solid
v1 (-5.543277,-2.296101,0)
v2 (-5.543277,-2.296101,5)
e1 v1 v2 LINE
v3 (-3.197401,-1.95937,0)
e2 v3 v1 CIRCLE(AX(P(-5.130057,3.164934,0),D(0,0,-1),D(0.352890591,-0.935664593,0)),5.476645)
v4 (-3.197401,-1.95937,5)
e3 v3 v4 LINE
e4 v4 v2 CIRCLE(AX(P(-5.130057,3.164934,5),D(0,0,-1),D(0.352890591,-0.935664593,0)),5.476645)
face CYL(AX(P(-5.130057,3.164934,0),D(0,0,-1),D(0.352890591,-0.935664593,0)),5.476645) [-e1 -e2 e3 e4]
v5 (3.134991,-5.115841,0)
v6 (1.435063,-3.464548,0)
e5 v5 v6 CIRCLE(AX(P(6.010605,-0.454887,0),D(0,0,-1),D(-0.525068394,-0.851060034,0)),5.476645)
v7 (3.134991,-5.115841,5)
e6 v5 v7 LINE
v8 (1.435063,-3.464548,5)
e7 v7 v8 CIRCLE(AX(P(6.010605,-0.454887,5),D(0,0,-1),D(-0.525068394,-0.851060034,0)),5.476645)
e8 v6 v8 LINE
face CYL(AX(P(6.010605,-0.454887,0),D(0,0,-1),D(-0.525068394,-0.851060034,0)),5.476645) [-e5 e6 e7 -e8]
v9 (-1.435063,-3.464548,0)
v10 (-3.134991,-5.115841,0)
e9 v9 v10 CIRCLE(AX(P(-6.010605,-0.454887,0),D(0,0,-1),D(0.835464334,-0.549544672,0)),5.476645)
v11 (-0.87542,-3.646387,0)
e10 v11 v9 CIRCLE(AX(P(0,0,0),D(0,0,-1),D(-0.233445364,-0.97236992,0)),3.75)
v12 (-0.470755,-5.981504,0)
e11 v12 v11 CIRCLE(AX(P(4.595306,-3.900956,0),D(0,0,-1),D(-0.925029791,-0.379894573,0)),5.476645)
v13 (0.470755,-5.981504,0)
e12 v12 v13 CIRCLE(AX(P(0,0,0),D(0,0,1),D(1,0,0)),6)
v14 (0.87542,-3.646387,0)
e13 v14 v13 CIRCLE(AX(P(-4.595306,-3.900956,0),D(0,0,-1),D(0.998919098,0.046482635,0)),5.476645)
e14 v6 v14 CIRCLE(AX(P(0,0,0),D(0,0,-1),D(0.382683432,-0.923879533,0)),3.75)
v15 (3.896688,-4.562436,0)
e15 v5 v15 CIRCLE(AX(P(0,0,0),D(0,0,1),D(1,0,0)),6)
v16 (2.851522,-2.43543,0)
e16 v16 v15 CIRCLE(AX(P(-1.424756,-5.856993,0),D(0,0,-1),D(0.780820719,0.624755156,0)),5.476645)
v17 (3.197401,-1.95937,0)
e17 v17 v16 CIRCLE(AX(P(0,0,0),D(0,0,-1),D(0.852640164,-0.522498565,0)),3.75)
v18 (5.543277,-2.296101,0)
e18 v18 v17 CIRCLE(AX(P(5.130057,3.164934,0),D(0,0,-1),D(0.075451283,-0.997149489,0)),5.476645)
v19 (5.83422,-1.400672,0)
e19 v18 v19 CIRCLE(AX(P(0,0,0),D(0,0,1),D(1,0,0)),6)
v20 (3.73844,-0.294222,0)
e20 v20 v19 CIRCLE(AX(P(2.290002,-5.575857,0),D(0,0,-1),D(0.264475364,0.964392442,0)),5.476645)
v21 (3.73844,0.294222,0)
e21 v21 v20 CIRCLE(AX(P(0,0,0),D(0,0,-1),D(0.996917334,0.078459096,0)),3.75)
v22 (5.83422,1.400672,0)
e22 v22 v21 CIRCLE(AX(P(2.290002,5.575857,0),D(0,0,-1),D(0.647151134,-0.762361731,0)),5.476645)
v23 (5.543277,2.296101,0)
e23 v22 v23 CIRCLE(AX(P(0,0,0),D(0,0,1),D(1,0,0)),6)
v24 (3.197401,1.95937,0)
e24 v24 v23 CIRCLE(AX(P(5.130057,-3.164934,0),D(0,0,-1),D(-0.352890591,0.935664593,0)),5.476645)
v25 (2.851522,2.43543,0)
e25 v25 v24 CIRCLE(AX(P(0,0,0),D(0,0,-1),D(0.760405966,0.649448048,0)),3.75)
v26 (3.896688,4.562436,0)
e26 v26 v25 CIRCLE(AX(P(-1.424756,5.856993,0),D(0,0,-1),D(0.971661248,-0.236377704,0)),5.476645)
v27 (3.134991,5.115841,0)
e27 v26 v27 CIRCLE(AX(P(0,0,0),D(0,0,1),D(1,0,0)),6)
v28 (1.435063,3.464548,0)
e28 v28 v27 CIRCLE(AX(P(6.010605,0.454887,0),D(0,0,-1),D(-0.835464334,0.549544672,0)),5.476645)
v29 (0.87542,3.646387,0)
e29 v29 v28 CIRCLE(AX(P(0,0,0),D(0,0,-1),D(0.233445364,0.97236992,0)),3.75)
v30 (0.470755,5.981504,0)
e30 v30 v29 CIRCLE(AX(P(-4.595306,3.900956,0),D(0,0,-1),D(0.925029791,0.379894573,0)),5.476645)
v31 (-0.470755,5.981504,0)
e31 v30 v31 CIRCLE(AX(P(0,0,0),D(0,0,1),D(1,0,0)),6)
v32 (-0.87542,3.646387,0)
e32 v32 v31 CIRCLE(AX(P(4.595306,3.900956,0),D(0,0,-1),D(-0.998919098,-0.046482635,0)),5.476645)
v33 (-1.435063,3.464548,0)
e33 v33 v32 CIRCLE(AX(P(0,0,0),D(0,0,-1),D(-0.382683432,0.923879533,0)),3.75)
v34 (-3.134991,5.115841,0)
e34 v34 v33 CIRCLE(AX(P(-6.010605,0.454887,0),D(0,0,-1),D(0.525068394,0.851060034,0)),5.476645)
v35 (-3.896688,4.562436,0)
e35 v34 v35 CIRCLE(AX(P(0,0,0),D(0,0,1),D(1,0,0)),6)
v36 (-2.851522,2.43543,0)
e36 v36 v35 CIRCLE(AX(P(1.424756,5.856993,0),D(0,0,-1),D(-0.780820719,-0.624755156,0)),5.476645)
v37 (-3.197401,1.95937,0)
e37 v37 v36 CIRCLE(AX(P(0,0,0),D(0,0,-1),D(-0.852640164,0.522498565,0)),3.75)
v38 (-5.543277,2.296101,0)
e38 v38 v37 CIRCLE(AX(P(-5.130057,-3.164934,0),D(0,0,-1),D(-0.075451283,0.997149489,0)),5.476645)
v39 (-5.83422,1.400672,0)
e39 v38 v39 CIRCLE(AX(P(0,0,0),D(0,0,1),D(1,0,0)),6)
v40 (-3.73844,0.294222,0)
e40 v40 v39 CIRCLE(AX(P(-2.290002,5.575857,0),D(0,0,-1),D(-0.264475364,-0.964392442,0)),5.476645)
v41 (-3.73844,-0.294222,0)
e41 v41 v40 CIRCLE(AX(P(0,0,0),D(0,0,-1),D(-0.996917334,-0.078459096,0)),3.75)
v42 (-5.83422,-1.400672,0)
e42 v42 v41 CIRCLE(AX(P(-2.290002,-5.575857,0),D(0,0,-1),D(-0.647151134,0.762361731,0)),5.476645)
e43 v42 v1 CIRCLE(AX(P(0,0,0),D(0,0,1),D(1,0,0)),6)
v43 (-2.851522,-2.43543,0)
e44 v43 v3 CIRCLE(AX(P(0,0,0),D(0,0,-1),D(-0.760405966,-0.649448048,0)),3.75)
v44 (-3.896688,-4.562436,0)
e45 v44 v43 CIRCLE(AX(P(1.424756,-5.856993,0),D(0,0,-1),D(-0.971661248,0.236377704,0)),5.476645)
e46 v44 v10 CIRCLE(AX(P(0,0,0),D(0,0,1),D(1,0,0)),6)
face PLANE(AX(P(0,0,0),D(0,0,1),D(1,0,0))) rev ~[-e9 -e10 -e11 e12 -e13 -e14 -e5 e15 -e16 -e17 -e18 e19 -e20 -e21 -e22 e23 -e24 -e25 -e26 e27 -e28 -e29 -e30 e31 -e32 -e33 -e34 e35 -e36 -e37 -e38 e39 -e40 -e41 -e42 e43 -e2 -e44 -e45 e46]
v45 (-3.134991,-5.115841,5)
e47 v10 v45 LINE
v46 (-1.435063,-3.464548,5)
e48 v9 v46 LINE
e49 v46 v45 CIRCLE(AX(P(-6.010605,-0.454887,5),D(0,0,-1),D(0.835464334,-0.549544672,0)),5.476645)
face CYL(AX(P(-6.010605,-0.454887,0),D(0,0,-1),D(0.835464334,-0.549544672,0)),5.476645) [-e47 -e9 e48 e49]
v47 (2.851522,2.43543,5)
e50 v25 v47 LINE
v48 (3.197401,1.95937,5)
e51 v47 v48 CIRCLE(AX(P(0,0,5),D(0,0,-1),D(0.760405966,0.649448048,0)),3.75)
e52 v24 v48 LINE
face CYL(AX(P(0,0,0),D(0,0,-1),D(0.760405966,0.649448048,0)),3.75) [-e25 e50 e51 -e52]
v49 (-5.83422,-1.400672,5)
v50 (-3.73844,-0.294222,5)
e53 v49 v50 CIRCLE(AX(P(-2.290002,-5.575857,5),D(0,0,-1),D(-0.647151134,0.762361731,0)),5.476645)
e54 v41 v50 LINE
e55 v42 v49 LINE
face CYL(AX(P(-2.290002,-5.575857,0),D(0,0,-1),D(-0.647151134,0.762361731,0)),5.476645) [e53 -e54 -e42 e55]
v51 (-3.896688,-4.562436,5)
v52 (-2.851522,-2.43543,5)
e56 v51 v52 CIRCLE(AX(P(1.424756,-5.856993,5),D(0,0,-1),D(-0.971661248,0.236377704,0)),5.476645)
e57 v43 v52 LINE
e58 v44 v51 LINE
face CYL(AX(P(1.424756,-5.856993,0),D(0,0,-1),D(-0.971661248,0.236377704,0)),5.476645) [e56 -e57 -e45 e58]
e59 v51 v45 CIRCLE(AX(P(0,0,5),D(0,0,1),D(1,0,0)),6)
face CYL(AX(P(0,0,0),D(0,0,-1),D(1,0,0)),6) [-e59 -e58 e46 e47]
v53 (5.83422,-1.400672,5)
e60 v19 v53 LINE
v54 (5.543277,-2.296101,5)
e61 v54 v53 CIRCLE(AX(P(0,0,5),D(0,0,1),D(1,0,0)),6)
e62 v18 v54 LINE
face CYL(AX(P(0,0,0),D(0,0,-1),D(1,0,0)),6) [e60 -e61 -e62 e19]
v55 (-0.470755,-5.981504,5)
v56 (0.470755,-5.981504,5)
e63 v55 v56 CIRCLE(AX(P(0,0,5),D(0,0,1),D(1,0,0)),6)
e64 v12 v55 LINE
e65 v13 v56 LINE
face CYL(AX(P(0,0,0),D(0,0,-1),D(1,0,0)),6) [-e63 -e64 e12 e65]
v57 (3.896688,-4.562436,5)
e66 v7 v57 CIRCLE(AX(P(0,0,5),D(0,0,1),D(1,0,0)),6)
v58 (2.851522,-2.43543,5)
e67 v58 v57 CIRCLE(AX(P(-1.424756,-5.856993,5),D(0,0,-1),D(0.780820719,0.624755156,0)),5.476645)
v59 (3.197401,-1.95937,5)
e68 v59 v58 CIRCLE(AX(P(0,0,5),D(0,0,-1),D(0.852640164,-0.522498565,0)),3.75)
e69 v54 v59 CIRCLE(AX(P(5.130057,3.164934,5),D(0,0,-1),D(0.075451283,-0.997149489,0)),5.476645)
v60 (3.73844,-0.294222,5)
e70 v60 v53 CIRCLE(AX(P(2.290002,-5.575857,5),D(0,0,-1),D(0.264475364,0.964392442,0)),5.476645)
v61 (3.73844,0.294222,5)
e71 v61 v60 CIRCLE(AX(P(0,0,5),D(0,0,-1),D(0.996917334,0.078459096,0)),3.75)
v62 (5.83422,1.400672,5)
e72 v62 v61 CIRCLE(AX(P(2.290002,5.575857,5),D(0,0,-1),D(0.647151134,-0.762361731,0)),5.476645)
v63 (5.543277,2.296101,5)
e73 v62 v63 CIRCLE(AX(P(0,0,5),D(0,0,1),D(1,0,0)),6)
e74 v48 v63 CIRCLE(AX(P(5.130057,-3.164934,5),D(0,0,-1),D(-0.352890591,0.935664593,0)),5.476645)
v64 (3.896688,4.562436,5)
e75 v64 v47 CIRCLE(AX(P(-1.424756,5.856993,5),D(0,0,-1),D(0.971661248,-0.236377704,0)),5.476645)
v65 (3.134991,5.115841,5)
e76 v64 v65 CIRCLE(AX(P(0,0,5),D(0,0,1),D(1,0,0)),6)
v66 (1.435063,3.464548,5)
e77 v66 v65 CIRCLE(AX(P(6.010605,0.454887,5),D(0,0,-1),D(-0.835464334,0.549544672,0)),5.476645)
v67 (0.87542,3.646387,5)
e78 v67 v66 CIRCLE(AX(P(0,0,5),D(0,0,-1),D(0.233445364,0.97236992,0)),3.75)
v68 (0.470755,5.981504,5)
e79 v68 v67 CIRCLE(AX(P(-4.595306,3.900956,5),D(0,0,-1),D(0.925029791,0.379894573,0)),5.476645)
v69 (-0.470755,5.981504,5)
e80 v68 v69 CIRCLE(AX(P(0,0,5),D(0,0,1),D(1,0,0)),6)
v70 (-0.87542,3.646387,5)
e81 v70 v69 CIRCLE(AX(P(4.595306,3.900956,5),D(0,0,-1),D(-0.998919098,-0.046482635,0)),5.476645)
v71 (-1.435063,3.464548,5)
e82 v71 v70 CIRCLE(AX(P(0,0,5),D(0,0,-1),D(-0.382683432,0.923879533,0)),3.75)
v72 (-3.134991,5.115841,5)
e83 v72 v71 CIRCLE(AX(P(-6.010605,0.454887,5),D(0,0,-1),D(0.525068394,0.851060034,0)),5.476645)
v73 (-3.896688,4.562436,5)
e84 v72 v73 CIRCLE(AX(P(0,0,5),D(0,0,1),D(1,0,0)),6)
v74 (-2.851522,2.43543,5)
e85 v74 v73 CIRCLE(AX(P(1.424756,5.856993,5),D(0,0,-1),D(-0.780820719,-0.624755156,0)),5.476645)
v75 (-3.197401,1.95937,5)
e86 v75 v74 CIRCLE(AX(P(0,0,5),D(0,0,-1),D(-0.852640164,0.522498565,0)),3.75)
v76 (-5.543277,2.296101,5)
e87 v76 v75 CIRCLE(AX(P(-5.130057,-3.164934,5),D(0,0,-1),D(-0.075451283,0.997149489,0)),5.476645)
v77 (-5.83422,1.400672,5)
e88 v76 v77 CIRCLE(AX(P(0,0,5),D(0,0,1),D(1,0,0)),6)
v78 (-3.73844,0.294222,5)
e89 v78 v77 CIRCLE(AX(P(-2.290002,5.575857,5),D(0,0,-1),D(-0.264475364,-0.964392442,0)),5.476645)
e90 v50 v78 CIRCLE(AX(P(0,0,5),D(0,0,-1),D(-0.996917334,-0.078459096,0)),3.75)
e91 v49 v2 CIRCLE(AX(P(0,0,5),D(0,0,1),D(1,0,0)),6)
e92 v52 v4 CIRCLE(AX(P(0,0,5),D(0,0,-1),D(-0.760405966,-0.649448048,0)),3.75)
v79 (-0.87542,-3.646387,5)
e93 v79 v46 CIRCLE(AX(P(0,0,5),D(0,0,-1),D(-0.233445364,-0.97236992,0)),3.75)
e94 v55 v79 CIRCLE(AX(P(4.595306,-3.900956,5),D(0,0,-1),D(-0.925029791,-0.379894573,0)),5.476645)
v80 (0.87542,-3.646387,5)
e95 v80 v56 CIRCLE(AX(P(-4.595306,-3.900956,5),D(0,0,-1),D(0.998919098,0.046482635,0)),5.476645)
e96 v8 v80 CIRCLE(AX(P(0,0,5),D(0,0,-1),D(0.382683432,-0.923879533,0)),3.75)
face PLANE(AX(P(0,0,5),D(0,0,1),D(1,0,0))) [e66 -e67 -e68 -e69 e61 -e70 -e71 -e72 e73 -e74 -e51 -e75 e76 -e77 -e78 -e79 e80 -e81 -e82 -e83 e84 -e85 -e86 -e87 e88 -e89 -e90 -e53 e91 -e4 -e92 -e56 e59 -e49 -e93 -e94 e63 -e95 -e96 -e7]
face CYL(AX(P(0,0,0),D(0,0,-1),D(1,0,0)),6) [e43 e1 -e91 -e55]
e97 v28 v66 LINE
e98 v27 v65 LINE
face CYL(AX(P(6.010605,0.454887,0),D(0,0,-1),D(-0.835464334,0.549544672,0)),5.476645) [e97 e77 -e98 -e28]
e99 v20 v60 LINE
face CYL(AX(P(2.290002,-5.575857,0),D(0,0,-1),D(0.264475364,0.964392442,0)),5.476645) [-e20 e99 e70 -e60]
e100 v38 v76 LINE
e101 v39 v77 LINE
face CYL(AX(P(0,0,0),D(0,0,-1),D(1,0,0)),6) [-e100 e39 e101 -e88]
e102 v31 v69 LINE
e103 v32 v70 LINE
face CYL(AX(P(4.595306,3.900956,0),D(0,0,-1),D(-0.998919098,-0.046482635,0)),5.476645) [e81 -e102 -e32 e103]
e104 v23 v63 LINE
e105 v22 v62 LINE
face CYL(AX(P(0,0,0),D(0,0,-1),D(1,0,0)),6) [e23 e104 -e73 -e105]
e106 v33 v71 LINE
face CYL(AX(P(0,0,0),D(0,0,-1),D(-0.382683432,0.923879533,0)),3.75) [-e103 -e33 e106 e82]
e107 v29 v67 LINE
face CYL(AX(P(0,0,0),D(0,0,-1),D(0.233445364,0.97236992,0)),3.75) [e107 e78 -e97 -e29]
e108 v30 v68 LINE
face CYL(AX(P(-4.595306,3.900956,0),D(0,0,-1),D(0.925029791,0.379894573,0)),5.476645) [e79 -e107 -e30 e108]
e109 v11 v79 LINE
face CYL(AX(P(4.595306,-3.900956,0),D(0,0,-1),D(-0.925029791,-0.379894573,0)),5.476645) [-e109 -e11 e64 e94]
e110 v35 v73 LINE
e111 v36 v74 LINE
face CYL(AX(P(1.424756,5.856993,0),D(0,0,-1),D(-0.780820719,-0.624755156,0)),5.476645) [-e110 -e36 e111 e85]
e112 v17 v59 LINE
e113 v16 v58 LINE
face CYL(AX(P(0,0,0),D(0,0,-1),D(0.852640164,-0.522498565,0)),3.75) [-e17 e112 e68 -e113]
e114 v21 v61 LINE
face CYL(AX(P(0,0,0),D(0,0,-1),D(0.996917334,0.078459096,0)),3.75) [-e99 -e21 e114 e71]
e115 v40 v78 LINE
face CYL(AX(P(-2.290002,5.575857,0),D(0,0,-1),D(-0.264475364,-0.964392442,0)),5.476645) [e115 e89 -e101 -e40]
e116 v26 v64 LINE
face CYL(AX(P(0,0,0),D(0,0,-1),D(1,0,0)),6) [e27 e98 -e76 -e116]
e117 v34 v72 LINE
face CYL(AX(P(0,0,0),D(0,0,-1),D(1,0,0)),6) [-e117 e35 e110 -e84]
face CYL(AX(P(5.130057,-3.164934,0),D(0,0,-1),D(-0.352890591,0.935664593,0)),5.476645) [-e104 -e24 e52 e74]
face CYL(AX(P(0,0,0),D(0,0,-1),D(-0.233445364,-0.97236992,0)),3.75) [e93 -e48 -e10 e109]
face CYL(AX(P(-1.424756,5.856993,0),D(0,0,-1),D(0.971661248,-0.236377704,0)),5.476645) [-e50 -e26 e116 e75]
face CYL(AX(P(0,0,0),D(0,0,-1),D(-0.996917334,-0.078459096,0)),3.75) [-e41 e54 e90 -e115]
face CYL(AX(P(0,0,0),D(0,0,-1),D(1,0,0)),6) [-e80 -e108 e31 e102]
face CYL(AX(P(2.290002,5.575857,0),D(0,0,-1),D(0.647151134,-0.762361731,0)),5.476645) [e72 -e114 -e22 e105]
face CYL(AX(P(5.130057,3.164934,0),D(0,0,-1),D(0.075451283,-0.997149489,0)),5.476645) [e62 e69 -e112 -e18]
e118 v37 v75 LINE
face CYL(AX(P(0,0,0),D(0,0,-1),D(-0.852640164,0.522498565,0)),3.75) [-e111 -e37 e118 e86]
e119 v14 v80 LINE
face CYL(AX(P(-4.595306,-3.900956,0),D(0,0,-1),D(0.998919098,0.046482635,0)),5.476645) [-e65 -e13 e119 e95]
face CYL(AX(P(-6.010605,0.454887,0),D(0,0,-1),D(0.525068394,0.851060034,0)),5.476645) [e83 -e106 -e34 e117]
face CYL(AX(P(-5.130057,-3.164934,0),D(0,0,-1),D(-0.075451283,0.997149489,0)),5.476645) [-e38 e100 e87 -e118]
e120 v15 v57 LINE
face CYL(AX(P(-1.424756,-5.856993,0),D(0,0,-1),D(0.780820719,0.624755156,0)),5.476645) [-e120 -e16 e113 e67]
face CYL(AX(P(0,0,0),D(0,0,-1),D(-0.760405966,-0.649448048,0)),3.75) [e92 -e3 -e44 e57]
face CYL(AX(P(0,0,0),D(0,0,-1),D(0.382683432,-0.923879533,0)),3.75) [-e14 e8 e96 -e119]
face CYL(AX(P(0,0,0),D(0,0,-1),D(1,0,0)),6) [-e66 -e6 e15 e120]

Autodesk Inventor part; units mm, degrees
sketch "Sketch1" plane through (0, 0, 0) normal (0, 0, 1) x (1, 0, 0)
  circle A0 centre (0, 0) radius 6
  dimension "d0" = 12
extrude "Extrusion1" add sketch "Sketch1" along normal blind 5
ref_plane "Work Plane2" through (0, 0, 2.5) normal (0, 0, 1) x (1, 0, 0)
sketch "Sketch2" plane through (0, 0, 0) normal (0, 0, -1) x (-1, 0, 0)
  circle A0 centre (0, 0) radius 6 projected
  circle A1 centre (0, 0) radius 5
  dimension "d3" = 10
surface extrude "Diámetro de separación" sketch "Sketch2" against normal through all shown no curves A1
ref_plane "Work Plane8" through (0, 0, 0) normal (0.9510565, 0.309017, 0) x (0, 0, 1)
ref_plane "Work Plane9" through (0, 0, 0) normal (1, 0, 0) x (0, 1, 0)
spur gear teeth "Engranaje recto" teeth 10 pitch diameter 10 tip diameter 12 root diameter 7.5 face width 5 start plane through (0, 0, 0) normal (0, 0, -1) x (-1, 0, 0)
equation "\"d0\" = da_da"
equation "\"d1\" = da_b"
equation "\"d3\" = da_d"
equation "\"da_da\" = 12"
equation "\"da_b\" = 5"
equation "\"da_d\" = 10"
properties part number "Engranaje recto1" material "Steel"
